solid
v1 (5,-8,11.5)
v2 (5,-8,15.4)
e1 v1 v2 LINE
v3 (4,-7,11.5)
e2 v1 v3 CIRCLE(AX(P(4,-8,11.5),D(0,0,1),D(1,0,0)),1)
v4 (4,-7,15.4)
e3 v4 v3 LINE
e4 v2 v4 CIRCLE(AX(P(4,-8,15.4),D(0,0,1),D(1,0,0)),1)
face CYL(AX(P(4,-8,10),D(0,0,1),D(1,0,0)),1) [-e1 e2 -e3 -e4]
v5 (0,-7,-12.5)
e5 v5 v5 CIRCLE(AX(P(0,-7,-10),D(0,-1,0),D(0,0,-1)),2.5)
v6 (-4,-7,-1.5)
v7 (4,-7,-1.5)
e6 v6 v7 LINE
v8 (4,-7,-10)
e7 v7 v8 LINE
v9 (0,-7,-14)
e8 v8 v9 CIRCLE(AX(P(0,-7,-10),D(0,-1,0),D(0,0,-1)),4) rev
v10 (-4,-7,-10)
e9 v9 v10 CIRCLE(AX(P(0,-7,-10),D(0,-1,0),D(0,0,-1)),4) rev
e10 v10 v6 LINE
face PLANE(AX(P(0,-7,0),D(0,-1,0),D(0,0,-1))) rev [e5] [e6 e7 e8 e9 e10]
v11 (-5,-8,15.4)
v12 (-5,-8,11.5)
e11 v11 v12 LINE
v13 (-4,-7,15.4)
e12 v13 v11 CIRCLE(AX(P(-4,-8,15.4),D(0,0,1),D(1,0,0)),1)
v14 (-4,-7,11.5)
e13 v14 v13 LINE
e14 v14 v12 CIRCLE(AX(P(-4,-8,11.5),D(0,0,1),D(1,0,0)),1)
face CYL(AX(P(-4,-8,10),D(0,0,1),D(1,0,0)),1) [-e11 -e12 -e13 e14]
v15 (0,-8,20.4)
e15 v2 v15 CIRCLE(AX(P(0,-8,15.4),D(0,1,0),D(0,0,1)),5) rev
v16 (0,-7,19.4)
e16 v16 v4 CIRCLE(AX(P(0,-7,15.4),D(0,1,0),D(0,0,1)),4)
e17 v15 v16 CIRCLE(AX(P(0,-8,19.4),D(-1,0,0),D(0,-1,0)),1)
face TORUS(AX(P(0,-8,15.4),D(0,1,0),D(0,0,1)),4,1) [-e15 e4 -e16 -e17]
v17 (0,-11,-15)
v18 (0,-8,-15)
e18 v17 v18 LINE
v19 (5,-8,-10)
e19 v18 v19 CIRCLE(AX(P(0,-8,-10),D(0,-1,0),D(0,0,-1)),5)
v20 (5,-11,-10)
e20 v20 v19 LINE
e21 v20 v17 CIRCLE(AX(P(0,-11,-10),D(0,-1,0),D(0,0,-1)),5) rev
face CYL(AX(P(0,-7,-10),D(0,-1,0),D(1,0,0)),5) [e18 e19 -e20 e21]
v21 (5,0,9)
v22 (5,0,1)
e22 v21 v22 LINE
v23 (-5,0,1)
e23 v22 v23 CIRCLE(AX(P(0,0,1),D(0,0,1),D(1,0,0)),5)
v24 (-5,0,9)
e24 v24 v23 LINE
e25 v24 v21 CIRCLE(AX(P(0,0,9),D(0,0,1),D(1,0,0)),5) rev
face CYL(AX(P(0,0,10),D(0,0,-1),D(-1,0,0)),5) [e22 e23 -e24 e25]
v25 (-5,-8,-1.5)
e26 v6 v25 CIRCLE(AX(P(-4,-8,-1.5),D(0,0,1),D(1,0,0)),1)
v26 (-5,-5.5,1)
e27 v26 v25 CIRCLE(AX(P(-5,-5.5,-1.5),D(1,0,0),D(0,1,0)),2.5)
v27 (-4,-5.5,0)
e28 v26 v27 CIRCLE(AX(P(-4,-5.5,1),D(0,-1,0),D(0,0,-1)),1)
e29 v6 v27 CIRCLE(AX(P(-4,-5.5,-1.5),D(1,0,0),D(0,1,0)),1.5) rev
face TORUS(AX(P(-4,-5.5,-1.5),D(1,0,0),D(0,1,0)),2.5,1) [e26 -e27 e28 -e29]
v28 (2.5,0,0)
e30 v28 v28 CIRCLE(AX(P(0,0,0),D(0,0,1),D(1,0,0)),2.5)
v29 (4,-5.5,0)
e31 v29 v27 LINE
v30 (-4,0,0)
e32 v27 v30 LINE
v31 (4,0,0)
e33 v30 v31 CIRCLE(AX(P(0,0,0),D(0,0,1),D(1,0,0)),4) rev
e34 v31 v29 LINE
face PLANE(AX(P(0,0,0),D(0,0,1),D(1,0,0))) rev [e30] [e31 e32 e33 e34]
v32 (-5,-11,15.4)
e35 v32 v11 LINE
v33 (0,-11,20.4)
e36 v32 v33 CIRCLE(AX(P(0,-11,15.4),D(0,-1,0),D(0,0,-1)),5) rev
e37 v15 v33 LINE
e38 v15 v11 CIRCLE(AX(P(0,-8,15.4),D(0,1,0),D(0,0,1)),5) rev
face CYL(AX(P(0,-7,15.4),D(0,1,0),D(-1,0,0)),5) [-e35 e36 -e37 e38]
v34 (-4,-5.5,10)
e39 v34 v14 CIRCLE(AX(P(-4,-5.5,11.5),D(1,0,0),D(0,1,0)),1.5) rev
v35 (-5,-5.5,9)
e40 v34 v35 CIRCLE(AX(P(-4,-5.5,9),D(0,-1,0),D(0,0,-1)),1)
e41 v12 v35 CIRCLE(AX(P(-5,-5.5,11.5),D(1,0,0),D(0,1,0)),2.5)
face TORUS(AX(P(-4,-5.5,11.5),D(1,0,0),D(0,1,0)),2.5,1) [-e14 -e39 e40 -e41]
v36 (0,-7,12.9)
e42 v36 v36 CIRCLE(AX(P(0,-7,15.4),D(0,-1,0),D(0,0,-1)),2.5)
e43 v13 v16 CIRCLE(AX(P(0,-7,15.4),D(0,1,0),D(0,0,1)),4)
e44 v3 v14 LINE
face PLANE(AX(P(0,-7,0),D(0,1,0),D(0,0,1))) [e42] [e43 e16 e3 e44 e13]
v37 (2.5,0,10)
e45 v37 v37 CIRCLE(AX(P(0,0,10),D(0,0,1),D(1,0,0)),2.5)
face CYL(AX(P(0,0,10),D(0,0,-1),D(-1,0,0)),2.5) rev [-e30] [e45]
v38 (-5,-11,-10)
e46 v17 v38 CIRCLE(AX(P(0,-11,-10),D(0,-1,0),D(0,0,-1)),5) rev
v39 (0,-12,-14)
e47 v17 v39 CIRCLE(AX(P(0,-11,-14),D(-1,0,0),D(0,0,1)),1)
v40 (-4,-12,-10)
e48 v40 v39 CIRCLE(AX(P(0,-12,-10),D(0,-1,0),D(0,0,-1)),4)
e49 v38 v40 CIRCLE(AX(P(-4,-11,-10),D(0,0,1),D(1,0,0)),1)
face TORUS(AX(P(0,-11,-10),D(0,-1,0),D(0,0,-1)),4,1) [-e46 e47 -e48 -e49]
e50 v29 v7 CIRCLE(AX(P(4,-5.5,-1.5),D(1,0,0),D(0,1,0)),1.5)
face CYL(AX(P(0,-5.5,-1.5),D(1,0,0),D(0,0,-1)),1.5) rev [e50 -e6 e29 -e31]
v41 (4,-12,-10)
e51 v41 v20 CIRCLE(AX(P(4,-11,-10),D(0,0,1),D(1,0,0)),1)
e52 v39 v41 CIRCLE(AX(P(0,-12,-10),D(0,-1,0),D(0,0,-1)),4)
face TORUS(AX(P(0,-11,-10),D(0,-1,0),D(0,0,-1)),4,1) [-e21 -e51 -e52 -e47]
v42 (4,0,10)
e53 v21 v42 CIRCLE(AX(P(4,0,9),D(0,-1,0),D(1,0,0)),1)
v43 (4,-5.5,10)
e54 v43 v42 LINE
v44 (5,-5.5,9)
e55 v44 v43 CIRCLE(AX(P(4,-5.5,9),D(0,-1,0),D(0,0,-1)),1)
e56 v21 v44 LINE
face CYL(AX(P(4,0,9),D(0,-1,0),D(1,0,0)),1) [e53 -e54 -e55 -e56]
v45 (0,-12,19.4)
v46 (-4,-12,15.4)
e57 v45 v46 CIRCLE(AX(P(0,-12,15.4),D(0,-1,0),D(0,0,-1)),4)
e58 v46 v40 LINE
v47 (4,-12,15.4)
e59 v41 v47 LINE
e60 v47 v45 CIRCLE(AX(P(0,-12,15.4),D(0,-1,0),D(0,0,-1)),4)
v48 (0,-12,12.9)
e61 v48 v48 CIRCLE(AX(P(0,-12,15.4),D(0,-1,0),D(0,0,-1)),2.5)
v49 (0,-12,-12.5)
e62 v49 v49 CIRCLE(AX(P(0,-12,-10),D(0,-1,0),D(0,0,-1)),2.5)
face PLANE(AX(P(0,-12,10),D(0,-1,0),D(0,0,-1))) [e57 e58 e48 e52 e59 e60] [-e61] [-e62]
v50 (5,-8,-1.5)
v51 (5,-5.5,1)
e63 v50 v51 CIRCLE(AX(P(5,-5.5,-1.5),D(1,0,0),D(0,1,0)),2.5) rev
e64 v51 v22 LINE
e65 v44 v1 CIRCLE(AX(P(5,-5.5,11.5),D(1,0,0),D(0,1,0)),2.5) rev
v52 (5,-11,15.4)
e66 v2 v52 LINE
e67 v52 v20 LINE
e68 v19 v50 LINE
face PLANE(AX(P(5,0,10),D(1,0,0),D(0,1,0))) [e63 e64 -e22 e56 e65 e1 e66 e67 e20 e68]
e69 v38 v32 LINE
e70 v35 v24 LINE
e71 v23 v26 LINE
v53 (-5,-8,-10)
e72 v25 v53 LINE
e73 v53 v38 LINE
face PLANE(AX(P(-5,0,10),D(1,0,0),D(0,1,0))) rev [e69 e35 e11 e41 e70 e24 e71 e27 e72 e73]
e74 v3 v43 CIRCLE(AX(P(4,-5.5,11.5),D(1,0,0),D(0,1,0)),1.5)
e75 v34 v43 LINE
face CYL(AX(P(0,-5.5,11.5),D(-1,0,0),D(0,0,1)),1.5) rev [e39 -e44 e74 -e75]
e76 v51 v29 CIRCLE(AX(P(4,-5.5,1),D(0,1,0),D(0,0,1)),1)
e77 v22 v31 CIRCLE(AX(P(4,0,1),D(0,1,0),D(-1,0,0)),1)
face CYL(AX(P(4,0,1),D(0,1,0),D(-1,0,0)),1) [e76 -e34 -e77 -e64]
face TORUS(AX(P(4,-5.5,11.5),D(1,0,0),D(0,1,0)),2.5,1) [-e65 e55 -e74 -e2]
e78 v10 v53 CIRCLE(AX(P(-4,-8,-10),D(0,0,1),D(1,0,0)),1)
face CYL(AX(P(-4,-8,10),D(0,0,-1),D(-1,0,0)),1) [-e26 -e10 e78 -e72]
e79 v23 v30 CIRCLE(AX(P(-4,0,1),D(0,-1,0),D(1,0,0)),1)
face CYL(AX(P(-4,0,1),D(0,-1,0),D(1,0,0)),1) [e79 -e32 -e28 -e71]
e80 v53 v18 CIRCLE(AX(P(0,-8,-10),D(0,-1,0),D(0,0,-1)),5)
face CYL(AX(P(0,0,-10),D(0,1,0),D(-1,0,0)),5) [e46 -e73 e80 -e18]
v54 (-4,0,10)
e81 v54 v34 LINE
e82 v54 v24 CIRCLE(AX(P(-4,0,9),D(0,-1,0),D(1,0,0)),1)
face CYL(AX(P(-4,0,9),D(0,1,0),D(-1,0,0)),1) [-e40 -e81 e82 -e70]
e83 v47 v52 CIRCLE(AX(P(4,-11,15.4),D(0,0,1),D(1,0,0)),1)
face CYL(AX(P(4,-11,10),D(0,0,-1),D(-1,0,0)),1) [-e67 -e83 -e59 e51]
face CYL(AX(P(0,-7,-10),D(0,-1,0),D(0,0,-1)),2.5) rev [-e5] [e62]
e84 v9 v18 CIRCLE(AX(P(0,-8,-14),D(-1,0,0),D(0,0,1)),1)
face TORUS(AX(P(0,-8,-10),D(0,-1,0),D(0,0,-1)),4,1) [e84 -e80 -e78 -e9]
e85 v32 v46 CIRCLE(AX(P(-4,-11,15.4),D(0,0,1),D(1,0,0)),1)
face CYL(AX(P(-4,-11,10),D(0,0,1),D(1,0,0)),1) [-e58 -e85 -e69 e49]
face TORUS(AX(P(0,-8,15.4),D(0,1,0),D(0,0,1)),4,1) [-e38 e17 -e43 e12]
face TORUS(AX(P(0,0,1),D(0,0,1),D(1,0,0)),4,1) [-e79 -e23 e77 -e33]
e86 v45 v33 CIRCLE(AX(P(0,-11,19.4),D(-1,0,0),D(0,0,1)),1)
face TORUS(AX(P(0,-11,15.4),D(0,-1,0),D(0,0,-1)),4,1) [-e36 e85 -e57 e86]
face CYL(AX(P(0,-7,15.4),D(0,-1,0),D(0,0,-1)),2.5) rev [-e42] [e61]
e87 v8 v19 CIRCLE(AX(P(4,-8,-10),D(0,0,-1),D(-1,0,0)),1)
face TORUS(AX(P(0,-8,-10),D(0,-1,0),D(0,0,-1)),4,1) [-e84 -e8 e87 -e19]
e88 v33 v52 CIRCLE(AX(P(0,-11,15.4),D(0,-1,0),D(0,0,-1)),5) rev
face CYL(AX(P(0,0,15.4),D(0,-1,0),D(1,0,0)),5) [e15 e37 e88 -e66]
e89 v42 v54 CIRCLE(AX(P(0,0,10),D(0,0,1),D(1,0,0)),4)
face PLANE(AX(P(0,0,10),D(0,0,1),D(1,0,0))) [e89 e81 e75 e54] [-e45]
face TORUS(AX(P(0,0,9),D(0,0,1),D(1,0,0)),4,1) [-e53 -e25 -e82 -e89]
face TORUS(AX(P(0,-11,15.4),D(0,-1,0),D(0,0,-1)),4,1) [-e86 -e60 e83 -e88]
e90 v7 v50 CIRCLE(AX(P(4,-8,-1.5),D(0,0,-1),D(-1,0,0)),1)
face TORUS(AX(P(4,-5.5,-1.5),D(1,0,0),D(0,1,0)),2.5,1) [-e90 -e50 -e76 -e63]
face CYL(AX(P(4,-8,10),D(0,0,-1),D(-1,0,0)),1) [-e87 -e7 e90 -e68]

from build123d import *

# Parameters (mm, degrees)
SKETCH1_R           = 2.5
BOSS_EXTRUDE1_DEPTH = 10
SKETCH2_W           = 10
SKETCH2_H           = 15
SKETCH2_R           = 2.5
SKETCH2_H_2         = 10.4
BOSS_EXTRUDE2_DEPTH = 5
FILLET1_R           = 5
FILLET2_R           = 1.5
FILLET3_R           = 1


with BuildPart() as part:
    # Sketch1 → Boss-Extrude1 (new body)
    with BuildSketch(Plane.XY):
        with BuildLine():
            Line((-5, 0), (-5, -12))
            Line((-5, -12), (5, -12))
            Line((5, -12), (5, 0))
            ThreePointArc((5, 0), (0, 5), (-5, 0))
        make_face()
        Circle(SKETCH1_R, mode=Mode.SUBTRACT)
    extrude(amount=BOSS_EXTRUDE1_DEPTH)

    # Sketch2 → Boss-Extrude2 (add)
    # profile 1 of 2: a face of its own
    with BuildSketch(Plane.XZ.offset(12)):
        with Locations((0, -7.5)):
            Rectangle(SKETCH2_W, SKETCH2_H)
        with Locations(Location((0, -10, 0), (0, 0, 270))):
            Circle(SKETCH2_R, mode=Mode.SUBTRACT)
    # profile 2 of 2: a face of its own
    with BuildSketch(Plane.XZ.offset(12)):
        with Locations((0, 15.2)):
            Rectangle(SKETCH2_W, SKETCH2_H_2)
        with Locations(Location((0, 15.4, 0), (0, 0, 270))):
            Circle(SKETCH2_R, mode=Mode.SUBTRACT)
    extrude(amount=-BOSS_EXTRUDE2_DEPTH)

    # Fillet1
    fillet1_edges = [part.edges().sort_by_distance(p)[0] for p in [
        (5, -9.5, -15),
        (5, -9.5, 20.4),
        (-5, -9.5, 20.4),
        (-5, -9.5, -15),
    ]]
    fillet(fillet1_edges, radius=FILLET1_R - 0.0001)  # a hair under: the kernel refuses the full size

    # Fillet2
    fillet2_edges = [part.edges().sort_by_distance(p)[0] for p in [
        (0, -7, 0),
        (0, -7, 10),
    ]]
    fillet(fillet2_edges, radius=FILLET2_R)

    # Fillet3
    fillet3_edges = [part.edges().sort_by_distance(p)[0] for p in [
        (5, -2.75, 10),
        (0, 5, 10),
        (-5, -2.75, 10),
        (-5, -12, 2.7),
        (5, -12, 2.7),
        (-3.535563195, -12, -13.535563195),
        (3.535563195, -12, -13.535563195),
        (-3.535563195, -12, 18.935563195),
        (3.535563195, -12, 18.935563195),
        (5, -7, -5.75005),
        (-3.535563195, -7, -13.535563195),
        (3.535563195, -7, -13.535563195),
        (-5, -7, 13.45005),
        (-3.535563195, -7, 18.935563195),
        (3.535563195, -7, 18.935563195),
        (5, -7, 13.45005),
        (-5, -7, -5.75005),
        (5, -6.560660172, 10.439339828),
        (-5, -6.560660172, 10.439339828),
        (-5, -6.560660172, -0.439339828),
        (5, -6.560660172, -0.439339828),
        (-5, -2.75, 0),
        (0, 5, 0),
        (5, -2.75, 0),
    ]]
    fillet(fillet3_edges, radius=FILLET3_R)


solid = part.part
